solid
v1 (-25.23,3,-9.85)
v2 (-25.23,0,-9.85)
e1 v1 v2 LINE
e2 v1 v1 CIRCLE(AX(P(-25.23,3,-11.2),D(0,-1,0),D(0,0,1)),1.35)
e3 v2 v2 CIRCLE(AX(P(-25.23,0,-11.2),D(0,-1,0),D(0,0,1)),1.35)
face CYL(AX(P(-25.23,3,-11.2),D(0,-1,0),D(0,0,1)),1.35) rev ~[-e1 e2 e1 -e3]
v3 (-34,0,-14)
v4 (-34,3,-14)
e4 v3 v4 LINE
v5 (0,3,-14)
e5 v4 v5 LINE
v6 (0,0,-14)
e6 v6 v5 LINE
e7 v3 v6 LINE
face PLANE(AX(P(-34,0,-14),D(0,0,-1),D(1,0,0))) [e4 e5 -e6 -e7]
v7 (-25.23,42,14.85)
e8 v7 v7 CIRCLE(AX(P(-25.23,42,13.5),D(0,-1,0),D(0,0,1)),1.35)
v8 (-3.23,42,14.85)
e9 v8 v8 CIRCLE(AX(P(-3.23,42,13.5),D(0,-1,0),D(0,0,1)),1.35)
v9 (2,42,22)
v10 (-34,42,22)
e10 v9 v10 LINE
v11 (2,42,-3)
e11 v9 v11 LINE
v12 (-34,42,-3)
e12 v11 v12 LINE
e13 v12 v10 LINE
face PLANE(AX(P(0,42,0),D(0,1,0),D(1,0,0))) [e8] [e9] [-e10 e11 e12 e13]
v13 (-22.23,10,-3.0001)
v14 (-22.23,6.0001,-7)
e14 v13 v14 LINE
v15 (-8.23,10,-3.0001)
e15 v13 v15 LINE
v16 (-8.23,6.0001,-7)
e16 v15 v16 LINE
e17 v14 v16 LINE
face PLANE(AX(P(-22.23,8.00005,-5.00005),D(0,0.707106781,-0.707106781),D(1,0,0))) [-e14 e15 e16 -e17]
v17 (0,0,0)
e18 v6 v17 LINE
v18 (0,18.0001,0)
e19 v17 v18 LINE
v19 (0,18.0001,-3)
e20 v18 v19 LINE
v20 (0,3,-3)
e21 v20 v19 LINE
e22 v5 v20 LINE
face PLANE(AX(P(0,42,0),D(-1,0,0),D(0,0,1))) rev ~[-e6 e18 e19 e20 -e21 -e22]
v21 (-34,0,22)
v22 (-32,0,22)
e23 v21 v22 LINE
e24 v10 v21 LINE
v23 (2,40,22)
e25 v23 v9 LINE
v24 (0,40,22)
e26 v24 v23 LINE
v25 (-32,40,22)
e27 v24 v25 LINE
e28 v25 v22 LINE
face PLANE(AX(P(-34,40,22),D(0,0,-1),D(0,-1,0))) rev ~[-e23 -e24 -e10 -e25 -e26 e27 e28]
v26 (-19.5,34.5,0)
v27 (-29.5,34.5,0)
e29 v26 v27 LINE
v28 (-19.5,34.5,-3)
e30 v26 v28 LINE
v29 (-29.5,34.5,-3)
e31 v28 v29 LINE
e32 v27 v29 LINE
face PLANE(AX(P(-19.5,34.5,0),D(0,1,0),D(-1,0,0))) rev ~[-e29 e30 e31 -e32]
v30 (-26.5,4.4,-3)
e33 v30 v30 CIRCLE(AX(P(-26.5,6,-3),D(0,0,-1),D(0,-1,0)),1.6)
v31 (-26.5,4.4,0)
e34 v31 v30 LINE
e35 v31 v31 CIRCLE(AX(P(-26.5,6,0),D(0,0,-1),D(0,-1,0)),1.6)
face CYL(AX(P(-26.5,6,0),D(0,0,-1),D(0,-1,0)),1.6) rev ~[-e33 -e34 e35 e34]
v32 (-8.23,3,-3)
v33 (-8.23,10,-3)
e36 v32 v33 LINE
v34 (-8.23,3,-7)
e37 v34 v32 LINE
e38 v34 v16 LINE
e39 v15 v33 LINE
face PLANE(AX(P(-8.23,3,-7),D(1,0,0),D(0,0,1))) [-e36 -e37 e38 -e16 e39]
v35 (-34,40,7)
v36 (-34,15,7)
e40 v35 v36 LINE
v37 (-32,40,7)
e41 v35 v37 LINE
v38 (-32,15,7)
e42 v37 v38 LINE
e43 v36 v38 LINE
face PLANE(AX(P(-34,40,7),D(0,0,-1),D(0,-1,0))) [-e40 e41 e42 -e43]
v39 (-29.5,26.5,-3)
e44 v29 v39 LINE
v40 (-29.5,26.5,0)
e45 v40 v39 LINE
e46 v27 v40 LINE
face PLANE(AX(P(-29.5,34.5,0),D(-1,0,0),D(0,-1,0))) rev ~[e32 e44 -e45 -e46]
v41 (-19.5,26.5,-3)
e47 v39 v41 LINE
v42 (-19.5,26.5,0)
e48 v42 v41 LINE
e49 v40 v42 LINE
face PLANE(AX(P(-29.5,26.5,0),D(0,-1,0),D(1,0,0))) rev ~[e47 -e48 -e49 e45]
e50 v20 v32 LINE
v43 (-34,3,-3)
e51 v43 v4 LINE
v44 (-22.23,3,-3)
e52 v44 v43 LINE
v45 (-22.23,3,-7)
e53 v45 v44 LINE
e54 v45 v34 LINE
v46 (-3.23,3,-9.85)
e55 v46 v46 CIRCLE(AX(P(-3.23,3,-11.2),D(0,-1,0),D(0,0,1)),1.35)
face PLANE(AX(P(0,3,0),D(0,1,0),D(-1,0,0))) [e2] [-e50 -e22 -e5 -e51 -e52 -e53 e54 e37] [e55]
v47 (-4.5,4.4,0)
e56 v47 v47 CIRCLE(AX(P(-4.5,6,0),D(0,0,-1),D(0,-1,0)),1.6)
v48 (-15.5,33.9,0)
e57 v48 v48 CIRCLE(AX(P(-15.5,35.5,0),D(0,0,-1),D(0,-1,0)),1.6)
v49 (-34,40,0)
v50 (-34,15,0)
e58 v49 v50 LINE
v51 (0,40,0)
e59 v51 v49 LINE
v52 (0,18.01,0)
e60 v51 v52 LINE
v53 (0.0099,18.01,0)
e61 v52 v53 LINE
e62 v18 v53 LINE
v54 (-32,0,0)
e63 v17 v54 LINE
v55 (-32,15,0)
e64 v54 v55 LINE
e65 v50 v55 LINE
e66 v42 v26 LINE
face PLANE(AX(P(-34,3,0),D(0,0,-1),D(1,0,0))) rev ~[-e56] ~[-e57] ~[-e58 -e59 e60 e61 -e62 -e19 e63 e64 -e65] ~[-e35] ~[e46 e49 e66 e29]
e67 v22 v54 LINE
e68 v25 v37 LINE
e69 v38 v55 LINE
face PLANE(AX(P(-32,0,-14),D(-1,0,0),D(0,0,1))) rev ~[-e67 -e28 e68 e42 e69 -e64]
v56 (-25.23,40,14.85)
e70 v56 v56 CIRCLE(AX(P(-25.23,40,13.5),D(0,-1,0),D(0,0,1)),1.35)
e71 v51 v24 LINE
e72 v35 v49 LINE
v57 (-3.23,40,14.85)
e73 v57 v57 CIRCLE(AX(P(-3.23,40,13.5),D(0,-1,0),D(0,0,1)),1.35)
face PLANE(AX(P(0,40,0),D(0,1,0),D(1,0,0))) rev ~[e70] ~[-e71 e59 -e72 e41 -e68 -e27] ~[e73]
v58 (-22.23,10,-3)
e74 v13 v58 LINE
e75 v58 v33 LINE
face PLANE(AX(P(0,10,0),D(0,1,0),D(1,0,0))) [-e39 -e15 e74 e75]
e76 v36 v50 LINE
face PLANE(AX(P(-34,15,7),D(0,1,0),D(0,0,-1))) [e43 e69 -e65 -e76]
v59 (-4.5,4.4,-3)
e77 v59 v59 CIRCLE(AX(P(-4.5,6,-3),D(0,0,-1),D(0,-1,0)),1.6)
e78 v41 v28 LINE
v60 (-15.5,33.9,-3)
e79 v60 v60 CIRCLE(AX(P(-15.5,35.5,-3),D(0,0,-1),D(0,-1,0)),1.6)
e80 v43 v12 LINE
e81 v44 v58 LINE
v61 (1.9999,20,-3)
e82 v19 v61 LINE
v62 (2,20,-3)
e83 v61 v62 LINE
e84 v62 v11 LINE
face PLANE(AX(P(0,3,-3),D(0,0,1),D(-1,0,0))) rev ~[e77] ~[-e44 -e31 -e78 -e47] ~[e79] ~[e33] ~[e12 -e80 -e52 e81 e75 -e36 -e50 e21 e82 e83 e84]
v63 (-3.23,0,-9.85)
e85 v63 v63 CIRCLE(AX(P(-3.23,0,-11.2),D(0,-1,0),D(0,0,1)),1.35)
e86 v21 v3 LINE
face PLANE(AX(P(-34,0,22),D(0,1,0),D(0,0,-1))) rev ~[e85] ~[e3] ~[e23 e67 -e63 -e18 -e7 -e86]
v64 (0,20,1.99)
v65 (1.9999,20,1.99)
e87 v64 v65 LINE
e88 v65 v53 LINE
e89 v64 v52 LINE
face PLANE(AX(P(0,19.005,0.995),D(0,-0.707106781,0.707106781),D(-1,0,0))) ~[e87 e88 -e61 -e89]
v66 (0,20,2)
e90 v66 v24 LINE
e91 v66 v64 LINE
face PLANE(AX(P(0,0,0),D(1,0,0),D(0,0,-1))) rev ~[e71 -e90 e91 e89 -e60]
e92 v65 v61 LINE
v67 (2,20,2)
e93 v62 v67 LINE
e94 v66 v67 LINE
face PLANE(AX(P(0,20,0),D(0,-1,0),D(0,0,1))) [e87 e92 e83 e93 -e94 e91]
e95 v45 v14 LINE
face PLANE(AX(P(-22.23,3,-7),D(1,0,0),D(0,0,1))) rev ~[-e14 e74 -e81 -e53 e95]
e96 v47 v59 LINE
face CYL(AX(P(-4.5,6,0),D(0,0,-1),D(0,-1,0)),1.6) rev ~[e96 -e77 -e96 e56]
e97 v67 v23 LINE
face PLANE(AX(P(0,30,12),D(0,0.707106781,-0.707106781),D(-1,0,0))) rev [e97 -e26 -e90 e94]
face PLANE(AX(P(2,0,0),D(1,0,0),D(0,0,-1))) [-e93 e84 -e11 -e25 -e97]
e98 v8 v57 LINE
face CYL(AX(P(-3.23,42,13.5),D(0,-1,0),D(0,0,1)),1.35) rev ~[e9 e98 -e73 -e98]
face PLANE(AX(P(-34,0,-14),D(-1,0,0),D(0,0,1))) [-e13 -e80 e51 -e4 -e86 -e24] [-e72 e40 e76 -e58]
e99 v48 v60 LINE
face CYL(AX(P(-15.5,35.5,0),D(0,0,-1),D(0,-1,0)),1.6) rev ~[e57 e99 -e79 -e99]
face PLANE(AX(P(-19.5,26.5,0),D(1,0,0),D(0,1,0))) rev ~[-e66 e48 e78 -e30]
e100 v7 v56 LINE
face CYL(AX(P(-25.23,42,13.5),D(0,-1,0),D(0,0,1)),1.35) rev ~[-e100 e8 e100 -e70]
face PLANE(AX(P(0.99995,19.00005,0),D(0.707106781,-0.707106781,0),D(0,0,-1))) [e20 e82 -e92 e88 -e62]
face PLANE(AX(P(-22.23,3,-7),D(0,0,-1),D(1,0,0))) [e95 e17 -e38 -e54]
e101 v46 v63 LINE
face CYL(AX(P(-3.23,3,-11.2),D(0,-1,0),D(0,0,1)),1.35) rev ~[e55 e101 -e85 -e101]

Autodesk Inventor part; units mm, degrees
ref_plane "YZ Plane" through (0, 0, 0) normal (1, 0, 0) x (0, 1, 0)
ref_plane "XZ Plane" through (0, 0, 0) normal (0, 1, 0) x (-1, 0, 0)
ref_plane "XY Plane" through (0, 0, 0) normal (0, 0, 1) x (1, 0, 0)
sketch "Sketch1" plane through (0, 0, 0) normal (0, 1, 0) x (-1, 0, 0)
  line L0 (0, 0) -> (34, 0)
  line L1 (34, 0) -> (34, -14)
  line L2 (34, -14) -> (0, -14)
  line L3 (0, -14) -> (0, 0)
  dimension "d0" = 34
  dimension "d1" = 14
extrude "Extrusion1" add sketch "Sketch1" along normal blind 3
sketch "Sketch2" plane through (0, 3, 0) normal (0, 1, 0) x (1, 0, 0)
  line L0 (-34, 0) -> (0, 0) projected
  line L1 (0, 0) -> (0, 14) projected
  line L2 (0, 14) -> (-34, 14) projected
  line L3 (-34, 14) -> (-34, 0) projected
  point P0 (-25.23, 11.2)
  point P1 (-3.23, 11.2)
  dimension "d59" = 22
  dimension "d60" = 8.77
hole "Hole1" at (-25.23, 3, -11.2) at (-3.23, 3, -11.2) direction (0, -1, 0) diameter 2.7 end through all
sketch "Sketch3" plane through (0, 3, 0) normal (0, 1, 0) x (1, 0, 0)
  circle A0 centre (-25.23, 11.2) radius 1.35 projected
  circle A1 centre (-3.23, 11.2) radius 1.35 projected
  line L0 (-34, 0) -> (0, 0) projected
  line L1 (0, 0) -> (0, 14) projected
  line L2 (0, 14) -> (-34, 14) projected
  line L3 (-34, 14) -> (-34, 0) projected
  line L4 (0, 0) -> (-34, 0) projected
  line L5 (-34, 0) -> (0, 0)
  line L6 (0, 0) -> (0, 3)
  line L7 (0, 3) -> (-34, 3)
  line L8 (-34, 3) -> (-34, 0)
  dimension "d14" = 3
extrude "Extrusion2" add sketch "Sketch3" along normal blind 39 contours L3 L7 L1 L0
sketch "Sketch4" plane through (0, 42, 0) normal (0, 1, 0) x (1, 0, 0)
  line L0 (-34, 0) -> (0, 0) projected
  line L1 (0, 0) -> (0, 3) projected
  line L2 (0, 3) -> (-34, 3) projected
  line L3 (-34, 3) -> (-34, 0) projected
  line L4 (-34, 3) -> (0, 3)
  line L5 (0, 3) -> (0, -22)
  line L6 (0, -22) -> (-34, -22)
  line L7 (-34, -22) -> (-34, 3)
  dimension "d17" = 25
extrude "Extrusion3" add sketch "Sketch4" against normal blind 2 contours L0 L5 L6 L7
sketch "Sketch6" plane through (0, 42, 0) normal (0, 1, 0) x (1, 0, 0)
  line L0 (0, -22) -> (0, 3) projected
  line L1 (0, 3) -> (-34, 3) projected
  line L2 (-34, 3) -> (-34, -22) projected
  line L3 (-34, -22) -> (0, -22) projected
  line L4 (0, 14) -> (0, -22) projected
  point P0 (0, 0)
  point P1 (-3.23, -13.5)
  point P2 (-25.23, -13.5)
  dimension "d57" = 22
  dimension "d58" = 3.23
hole "Hole2" at (-3.23, 42, 13.5) at (-25.23, 42, 13.5) direction (0, -1, 0) diameter 2.7 end through all
sketch "Sketch7" plane through (-34, 0, 0) normal (0, 0, 1) x (1, 0, 0)
  line L0 (34, 40) -> (0, 40) projected
  line L1 (0, 0) -> (0, 40) projected
  line L2 (34, 0) -> (0, 0) projected
  line L3 (34, 0) -> (34, 40) projected
  point P0 (7.5, 6)
  point P1 (29.5, 6)
  point P2 (18.5, 35.5)
  dimension "d50" = 11
  dimension "d51" = 29.5
  dimension "d52" = 22
  dimension "d55" = 4.5
hole "Hole3" at (-26.5, 6, 0) at (-4.5, 6, 0) at (-15.5, 35.5, 0) direction (0, 0, -1) diameter 3.2 end through all
sketch "Sketch8" plane through (-34, 0, 0) normal (0, 0, 1) x (1, 0, 0)
  circle A0 centre (29.5, 6) radius 1.6 projected
  circle A1 centre (7.5, 6) radius 1.6 projected
  circle A2 centre (18.5, 35.5) radius 1.6 projected
  line L0 (34, 40) -> (0, 40) projected
  line L1 (0, 0) -> (0, 40) projected
  line L2 (34, 0) -> (0, 0) projected
  line L3 (14.5, 34.5) -> (4.5, 34.5)
  line L4 (4.5, 34.5) -> (4.5, 26.5)
  line L5 (4.5, 26.5) -> (14.5, 26.5)
  line L6 (14.5, 26.5) -> (14.5, 34.5)
  line L7 (34, 0) -> (34, 40) projected
  dimension "d46" = 10
  dimension "d47" = 8
  dimension "d53" = 1
  dimension "d54" = 4
extrude "Extrusion5" cut sketch "Sketch8" against normal blind 3 contours L6 L5 L4 L3
sketch "Sketch9" plane through (-34, 0, -14) normal (-1, 0, 0) x (0, 0, 1)
  line L0 (14, 0) -> (0, 0) projected
  line L1 (14, 0) -> (14, 40) projected
  line L2 (36, 40) -> (14, 40) projected
  line L3 (36, 42) -> (36, 40) projected
  line L4 (11, 42) -> (36, 42) projected
  line L5 (11, 3) -> (11, 42) projected
  line L6 (0, 3) -> (11, 3) projected
  line L7 (0, 0) -> (0, 3) projected
  line L8 (14, 40) -> (36, 40)
  line L9 (36, 40) -> (36, 0)
  line L10 (36, 0) -> (14, 0)
  line L11 (14, 0) -> (14, 40)
extrude "Extrusion6" add sketch "Sketch9" against normal blind 2 contours L1 L2 L9 L10
sketch "Sketch10" plane through (0, 0, 0) normal (1, 0, 0) x (0, 0, -1)
  line L0 (14, 0) -> (0, 0) projected
  line L1 (14, 0) -> (14, 3) projected
  line L2 (3, 3) -> (14, 3) projected
  line L3 (3, 3) -> (3, 42) projected
  line L4 (-22, 42) -> (3, 42) projected
  line L5 (-22, 42) -> (-22, 40) projected
  line L6 (0, 40) -> (-22, 40) projected
  line L7 (0, 0) -> (0, 40) projected
  line L8 (-22, 42) -> (-22, 40) projected
  line L9 (3, 3) -> (3, 42) projected
  line L10 (-22, 42) -> (3, 42)
  line L11 (3, 42) -> (3, 20)
  line L12 (3, 20) -> (-22, 20)
  line L13 (-22, 20) -> (-22, 42)
  dimension "d63" = 22
extrude "Extrusion7" add sketch "Sketch10" along normal blind 2 contours L12 L13 L6 L7 | L7 L6 L5 L4 L3 L12
chamfer "Chamfer1" distance 2 angle 45 1 edges at (0, 20, -1.5)
chamfer "Chamfer2" distance 20 angle 45 1 edges at (1, 20, 22)
chamfer "Chamfer3" distance 1.99 angle 45 1 edges at (0.9999, 20, 0)
sketch "Sketch11" plane through (-34, 0, -14) normal (-1, 0, 0) x (0, 0, 1)
  line L0 (14, 40) -> (14, 0) projected
  line L1 (36, 40) -> (14, 40) projected
  line L2 (14, 40) -> (21, 40)
  line L3 (21, 40) -> (21, 15)
  line L4 (21, 15) -> (14, 15)
  line L5 (14, 15) -> (14, 40)
  dimension "d75" = 7
  dimension "d76" = 25
extrude "Extrusion8" cut sketch "Sketch11" against normal blind 2
sketch "Sketch12" plane through (0, 3, 0) normal (0, 1, 0) x (1, 0, 0)
  line L0 (-34, 3) -> (0, 3) projected
  line L1 (0, 3) -> (0, 14) projected
  line L2 (0, 14) -> (-34, 14) projected
  line L3 (-34, 14) -> (-34, 3) projected
  circle A0 centre (-25.23, 11.2) radius 1.35 projected
  circle A1 centre (-3.23, 11.2) radius 1.35 projected
  line L4 (-34, 3) -> (0, 3) projected
  line L5 (-3.23, 11.2) -> (-8.23, 11.2)
  line L6 (-8.23, 11.2) -> (-8.23, 3)
  line L7 (-8.23, 3) -> (-3.23, 3)
  line L8 (-3.23, 3) -> (-3.23, 11.2)
  line L9 (-25.23, 11.2) -> (-22.23, 11.2)
  line L10 (-22.23, 11.2) -> (-22.23, 3)
  line L11 (-22.23, 3) -> (-25.23, 3)
  line L12 (-25.23, 3) -> (-25.23, 11.2)
  line L13 (-8.23, 3) -> (-22.23, 3)
  line L14 (-22.23, 3) -> (-22.23, 7)
  line L15 (-22.23, 7) -> (-8.23, 7)
  line L16 (-8.23, 7) -> (-8.23, 3)
  point P0 (0, 0)
  dimension "d79" = 5
  dimension "d80" = 3
  dimension "d81" = 4
extrude "Extrusion9" add sketch "Sketch12" along normal blind 7 contours L10 L15 L6 L0
chamfer "Chamfer4" distance 4 angle 45 1 edges at (-15.23, 10, -7)
properties part number "PantatKanan" material "Iron, Gray"
